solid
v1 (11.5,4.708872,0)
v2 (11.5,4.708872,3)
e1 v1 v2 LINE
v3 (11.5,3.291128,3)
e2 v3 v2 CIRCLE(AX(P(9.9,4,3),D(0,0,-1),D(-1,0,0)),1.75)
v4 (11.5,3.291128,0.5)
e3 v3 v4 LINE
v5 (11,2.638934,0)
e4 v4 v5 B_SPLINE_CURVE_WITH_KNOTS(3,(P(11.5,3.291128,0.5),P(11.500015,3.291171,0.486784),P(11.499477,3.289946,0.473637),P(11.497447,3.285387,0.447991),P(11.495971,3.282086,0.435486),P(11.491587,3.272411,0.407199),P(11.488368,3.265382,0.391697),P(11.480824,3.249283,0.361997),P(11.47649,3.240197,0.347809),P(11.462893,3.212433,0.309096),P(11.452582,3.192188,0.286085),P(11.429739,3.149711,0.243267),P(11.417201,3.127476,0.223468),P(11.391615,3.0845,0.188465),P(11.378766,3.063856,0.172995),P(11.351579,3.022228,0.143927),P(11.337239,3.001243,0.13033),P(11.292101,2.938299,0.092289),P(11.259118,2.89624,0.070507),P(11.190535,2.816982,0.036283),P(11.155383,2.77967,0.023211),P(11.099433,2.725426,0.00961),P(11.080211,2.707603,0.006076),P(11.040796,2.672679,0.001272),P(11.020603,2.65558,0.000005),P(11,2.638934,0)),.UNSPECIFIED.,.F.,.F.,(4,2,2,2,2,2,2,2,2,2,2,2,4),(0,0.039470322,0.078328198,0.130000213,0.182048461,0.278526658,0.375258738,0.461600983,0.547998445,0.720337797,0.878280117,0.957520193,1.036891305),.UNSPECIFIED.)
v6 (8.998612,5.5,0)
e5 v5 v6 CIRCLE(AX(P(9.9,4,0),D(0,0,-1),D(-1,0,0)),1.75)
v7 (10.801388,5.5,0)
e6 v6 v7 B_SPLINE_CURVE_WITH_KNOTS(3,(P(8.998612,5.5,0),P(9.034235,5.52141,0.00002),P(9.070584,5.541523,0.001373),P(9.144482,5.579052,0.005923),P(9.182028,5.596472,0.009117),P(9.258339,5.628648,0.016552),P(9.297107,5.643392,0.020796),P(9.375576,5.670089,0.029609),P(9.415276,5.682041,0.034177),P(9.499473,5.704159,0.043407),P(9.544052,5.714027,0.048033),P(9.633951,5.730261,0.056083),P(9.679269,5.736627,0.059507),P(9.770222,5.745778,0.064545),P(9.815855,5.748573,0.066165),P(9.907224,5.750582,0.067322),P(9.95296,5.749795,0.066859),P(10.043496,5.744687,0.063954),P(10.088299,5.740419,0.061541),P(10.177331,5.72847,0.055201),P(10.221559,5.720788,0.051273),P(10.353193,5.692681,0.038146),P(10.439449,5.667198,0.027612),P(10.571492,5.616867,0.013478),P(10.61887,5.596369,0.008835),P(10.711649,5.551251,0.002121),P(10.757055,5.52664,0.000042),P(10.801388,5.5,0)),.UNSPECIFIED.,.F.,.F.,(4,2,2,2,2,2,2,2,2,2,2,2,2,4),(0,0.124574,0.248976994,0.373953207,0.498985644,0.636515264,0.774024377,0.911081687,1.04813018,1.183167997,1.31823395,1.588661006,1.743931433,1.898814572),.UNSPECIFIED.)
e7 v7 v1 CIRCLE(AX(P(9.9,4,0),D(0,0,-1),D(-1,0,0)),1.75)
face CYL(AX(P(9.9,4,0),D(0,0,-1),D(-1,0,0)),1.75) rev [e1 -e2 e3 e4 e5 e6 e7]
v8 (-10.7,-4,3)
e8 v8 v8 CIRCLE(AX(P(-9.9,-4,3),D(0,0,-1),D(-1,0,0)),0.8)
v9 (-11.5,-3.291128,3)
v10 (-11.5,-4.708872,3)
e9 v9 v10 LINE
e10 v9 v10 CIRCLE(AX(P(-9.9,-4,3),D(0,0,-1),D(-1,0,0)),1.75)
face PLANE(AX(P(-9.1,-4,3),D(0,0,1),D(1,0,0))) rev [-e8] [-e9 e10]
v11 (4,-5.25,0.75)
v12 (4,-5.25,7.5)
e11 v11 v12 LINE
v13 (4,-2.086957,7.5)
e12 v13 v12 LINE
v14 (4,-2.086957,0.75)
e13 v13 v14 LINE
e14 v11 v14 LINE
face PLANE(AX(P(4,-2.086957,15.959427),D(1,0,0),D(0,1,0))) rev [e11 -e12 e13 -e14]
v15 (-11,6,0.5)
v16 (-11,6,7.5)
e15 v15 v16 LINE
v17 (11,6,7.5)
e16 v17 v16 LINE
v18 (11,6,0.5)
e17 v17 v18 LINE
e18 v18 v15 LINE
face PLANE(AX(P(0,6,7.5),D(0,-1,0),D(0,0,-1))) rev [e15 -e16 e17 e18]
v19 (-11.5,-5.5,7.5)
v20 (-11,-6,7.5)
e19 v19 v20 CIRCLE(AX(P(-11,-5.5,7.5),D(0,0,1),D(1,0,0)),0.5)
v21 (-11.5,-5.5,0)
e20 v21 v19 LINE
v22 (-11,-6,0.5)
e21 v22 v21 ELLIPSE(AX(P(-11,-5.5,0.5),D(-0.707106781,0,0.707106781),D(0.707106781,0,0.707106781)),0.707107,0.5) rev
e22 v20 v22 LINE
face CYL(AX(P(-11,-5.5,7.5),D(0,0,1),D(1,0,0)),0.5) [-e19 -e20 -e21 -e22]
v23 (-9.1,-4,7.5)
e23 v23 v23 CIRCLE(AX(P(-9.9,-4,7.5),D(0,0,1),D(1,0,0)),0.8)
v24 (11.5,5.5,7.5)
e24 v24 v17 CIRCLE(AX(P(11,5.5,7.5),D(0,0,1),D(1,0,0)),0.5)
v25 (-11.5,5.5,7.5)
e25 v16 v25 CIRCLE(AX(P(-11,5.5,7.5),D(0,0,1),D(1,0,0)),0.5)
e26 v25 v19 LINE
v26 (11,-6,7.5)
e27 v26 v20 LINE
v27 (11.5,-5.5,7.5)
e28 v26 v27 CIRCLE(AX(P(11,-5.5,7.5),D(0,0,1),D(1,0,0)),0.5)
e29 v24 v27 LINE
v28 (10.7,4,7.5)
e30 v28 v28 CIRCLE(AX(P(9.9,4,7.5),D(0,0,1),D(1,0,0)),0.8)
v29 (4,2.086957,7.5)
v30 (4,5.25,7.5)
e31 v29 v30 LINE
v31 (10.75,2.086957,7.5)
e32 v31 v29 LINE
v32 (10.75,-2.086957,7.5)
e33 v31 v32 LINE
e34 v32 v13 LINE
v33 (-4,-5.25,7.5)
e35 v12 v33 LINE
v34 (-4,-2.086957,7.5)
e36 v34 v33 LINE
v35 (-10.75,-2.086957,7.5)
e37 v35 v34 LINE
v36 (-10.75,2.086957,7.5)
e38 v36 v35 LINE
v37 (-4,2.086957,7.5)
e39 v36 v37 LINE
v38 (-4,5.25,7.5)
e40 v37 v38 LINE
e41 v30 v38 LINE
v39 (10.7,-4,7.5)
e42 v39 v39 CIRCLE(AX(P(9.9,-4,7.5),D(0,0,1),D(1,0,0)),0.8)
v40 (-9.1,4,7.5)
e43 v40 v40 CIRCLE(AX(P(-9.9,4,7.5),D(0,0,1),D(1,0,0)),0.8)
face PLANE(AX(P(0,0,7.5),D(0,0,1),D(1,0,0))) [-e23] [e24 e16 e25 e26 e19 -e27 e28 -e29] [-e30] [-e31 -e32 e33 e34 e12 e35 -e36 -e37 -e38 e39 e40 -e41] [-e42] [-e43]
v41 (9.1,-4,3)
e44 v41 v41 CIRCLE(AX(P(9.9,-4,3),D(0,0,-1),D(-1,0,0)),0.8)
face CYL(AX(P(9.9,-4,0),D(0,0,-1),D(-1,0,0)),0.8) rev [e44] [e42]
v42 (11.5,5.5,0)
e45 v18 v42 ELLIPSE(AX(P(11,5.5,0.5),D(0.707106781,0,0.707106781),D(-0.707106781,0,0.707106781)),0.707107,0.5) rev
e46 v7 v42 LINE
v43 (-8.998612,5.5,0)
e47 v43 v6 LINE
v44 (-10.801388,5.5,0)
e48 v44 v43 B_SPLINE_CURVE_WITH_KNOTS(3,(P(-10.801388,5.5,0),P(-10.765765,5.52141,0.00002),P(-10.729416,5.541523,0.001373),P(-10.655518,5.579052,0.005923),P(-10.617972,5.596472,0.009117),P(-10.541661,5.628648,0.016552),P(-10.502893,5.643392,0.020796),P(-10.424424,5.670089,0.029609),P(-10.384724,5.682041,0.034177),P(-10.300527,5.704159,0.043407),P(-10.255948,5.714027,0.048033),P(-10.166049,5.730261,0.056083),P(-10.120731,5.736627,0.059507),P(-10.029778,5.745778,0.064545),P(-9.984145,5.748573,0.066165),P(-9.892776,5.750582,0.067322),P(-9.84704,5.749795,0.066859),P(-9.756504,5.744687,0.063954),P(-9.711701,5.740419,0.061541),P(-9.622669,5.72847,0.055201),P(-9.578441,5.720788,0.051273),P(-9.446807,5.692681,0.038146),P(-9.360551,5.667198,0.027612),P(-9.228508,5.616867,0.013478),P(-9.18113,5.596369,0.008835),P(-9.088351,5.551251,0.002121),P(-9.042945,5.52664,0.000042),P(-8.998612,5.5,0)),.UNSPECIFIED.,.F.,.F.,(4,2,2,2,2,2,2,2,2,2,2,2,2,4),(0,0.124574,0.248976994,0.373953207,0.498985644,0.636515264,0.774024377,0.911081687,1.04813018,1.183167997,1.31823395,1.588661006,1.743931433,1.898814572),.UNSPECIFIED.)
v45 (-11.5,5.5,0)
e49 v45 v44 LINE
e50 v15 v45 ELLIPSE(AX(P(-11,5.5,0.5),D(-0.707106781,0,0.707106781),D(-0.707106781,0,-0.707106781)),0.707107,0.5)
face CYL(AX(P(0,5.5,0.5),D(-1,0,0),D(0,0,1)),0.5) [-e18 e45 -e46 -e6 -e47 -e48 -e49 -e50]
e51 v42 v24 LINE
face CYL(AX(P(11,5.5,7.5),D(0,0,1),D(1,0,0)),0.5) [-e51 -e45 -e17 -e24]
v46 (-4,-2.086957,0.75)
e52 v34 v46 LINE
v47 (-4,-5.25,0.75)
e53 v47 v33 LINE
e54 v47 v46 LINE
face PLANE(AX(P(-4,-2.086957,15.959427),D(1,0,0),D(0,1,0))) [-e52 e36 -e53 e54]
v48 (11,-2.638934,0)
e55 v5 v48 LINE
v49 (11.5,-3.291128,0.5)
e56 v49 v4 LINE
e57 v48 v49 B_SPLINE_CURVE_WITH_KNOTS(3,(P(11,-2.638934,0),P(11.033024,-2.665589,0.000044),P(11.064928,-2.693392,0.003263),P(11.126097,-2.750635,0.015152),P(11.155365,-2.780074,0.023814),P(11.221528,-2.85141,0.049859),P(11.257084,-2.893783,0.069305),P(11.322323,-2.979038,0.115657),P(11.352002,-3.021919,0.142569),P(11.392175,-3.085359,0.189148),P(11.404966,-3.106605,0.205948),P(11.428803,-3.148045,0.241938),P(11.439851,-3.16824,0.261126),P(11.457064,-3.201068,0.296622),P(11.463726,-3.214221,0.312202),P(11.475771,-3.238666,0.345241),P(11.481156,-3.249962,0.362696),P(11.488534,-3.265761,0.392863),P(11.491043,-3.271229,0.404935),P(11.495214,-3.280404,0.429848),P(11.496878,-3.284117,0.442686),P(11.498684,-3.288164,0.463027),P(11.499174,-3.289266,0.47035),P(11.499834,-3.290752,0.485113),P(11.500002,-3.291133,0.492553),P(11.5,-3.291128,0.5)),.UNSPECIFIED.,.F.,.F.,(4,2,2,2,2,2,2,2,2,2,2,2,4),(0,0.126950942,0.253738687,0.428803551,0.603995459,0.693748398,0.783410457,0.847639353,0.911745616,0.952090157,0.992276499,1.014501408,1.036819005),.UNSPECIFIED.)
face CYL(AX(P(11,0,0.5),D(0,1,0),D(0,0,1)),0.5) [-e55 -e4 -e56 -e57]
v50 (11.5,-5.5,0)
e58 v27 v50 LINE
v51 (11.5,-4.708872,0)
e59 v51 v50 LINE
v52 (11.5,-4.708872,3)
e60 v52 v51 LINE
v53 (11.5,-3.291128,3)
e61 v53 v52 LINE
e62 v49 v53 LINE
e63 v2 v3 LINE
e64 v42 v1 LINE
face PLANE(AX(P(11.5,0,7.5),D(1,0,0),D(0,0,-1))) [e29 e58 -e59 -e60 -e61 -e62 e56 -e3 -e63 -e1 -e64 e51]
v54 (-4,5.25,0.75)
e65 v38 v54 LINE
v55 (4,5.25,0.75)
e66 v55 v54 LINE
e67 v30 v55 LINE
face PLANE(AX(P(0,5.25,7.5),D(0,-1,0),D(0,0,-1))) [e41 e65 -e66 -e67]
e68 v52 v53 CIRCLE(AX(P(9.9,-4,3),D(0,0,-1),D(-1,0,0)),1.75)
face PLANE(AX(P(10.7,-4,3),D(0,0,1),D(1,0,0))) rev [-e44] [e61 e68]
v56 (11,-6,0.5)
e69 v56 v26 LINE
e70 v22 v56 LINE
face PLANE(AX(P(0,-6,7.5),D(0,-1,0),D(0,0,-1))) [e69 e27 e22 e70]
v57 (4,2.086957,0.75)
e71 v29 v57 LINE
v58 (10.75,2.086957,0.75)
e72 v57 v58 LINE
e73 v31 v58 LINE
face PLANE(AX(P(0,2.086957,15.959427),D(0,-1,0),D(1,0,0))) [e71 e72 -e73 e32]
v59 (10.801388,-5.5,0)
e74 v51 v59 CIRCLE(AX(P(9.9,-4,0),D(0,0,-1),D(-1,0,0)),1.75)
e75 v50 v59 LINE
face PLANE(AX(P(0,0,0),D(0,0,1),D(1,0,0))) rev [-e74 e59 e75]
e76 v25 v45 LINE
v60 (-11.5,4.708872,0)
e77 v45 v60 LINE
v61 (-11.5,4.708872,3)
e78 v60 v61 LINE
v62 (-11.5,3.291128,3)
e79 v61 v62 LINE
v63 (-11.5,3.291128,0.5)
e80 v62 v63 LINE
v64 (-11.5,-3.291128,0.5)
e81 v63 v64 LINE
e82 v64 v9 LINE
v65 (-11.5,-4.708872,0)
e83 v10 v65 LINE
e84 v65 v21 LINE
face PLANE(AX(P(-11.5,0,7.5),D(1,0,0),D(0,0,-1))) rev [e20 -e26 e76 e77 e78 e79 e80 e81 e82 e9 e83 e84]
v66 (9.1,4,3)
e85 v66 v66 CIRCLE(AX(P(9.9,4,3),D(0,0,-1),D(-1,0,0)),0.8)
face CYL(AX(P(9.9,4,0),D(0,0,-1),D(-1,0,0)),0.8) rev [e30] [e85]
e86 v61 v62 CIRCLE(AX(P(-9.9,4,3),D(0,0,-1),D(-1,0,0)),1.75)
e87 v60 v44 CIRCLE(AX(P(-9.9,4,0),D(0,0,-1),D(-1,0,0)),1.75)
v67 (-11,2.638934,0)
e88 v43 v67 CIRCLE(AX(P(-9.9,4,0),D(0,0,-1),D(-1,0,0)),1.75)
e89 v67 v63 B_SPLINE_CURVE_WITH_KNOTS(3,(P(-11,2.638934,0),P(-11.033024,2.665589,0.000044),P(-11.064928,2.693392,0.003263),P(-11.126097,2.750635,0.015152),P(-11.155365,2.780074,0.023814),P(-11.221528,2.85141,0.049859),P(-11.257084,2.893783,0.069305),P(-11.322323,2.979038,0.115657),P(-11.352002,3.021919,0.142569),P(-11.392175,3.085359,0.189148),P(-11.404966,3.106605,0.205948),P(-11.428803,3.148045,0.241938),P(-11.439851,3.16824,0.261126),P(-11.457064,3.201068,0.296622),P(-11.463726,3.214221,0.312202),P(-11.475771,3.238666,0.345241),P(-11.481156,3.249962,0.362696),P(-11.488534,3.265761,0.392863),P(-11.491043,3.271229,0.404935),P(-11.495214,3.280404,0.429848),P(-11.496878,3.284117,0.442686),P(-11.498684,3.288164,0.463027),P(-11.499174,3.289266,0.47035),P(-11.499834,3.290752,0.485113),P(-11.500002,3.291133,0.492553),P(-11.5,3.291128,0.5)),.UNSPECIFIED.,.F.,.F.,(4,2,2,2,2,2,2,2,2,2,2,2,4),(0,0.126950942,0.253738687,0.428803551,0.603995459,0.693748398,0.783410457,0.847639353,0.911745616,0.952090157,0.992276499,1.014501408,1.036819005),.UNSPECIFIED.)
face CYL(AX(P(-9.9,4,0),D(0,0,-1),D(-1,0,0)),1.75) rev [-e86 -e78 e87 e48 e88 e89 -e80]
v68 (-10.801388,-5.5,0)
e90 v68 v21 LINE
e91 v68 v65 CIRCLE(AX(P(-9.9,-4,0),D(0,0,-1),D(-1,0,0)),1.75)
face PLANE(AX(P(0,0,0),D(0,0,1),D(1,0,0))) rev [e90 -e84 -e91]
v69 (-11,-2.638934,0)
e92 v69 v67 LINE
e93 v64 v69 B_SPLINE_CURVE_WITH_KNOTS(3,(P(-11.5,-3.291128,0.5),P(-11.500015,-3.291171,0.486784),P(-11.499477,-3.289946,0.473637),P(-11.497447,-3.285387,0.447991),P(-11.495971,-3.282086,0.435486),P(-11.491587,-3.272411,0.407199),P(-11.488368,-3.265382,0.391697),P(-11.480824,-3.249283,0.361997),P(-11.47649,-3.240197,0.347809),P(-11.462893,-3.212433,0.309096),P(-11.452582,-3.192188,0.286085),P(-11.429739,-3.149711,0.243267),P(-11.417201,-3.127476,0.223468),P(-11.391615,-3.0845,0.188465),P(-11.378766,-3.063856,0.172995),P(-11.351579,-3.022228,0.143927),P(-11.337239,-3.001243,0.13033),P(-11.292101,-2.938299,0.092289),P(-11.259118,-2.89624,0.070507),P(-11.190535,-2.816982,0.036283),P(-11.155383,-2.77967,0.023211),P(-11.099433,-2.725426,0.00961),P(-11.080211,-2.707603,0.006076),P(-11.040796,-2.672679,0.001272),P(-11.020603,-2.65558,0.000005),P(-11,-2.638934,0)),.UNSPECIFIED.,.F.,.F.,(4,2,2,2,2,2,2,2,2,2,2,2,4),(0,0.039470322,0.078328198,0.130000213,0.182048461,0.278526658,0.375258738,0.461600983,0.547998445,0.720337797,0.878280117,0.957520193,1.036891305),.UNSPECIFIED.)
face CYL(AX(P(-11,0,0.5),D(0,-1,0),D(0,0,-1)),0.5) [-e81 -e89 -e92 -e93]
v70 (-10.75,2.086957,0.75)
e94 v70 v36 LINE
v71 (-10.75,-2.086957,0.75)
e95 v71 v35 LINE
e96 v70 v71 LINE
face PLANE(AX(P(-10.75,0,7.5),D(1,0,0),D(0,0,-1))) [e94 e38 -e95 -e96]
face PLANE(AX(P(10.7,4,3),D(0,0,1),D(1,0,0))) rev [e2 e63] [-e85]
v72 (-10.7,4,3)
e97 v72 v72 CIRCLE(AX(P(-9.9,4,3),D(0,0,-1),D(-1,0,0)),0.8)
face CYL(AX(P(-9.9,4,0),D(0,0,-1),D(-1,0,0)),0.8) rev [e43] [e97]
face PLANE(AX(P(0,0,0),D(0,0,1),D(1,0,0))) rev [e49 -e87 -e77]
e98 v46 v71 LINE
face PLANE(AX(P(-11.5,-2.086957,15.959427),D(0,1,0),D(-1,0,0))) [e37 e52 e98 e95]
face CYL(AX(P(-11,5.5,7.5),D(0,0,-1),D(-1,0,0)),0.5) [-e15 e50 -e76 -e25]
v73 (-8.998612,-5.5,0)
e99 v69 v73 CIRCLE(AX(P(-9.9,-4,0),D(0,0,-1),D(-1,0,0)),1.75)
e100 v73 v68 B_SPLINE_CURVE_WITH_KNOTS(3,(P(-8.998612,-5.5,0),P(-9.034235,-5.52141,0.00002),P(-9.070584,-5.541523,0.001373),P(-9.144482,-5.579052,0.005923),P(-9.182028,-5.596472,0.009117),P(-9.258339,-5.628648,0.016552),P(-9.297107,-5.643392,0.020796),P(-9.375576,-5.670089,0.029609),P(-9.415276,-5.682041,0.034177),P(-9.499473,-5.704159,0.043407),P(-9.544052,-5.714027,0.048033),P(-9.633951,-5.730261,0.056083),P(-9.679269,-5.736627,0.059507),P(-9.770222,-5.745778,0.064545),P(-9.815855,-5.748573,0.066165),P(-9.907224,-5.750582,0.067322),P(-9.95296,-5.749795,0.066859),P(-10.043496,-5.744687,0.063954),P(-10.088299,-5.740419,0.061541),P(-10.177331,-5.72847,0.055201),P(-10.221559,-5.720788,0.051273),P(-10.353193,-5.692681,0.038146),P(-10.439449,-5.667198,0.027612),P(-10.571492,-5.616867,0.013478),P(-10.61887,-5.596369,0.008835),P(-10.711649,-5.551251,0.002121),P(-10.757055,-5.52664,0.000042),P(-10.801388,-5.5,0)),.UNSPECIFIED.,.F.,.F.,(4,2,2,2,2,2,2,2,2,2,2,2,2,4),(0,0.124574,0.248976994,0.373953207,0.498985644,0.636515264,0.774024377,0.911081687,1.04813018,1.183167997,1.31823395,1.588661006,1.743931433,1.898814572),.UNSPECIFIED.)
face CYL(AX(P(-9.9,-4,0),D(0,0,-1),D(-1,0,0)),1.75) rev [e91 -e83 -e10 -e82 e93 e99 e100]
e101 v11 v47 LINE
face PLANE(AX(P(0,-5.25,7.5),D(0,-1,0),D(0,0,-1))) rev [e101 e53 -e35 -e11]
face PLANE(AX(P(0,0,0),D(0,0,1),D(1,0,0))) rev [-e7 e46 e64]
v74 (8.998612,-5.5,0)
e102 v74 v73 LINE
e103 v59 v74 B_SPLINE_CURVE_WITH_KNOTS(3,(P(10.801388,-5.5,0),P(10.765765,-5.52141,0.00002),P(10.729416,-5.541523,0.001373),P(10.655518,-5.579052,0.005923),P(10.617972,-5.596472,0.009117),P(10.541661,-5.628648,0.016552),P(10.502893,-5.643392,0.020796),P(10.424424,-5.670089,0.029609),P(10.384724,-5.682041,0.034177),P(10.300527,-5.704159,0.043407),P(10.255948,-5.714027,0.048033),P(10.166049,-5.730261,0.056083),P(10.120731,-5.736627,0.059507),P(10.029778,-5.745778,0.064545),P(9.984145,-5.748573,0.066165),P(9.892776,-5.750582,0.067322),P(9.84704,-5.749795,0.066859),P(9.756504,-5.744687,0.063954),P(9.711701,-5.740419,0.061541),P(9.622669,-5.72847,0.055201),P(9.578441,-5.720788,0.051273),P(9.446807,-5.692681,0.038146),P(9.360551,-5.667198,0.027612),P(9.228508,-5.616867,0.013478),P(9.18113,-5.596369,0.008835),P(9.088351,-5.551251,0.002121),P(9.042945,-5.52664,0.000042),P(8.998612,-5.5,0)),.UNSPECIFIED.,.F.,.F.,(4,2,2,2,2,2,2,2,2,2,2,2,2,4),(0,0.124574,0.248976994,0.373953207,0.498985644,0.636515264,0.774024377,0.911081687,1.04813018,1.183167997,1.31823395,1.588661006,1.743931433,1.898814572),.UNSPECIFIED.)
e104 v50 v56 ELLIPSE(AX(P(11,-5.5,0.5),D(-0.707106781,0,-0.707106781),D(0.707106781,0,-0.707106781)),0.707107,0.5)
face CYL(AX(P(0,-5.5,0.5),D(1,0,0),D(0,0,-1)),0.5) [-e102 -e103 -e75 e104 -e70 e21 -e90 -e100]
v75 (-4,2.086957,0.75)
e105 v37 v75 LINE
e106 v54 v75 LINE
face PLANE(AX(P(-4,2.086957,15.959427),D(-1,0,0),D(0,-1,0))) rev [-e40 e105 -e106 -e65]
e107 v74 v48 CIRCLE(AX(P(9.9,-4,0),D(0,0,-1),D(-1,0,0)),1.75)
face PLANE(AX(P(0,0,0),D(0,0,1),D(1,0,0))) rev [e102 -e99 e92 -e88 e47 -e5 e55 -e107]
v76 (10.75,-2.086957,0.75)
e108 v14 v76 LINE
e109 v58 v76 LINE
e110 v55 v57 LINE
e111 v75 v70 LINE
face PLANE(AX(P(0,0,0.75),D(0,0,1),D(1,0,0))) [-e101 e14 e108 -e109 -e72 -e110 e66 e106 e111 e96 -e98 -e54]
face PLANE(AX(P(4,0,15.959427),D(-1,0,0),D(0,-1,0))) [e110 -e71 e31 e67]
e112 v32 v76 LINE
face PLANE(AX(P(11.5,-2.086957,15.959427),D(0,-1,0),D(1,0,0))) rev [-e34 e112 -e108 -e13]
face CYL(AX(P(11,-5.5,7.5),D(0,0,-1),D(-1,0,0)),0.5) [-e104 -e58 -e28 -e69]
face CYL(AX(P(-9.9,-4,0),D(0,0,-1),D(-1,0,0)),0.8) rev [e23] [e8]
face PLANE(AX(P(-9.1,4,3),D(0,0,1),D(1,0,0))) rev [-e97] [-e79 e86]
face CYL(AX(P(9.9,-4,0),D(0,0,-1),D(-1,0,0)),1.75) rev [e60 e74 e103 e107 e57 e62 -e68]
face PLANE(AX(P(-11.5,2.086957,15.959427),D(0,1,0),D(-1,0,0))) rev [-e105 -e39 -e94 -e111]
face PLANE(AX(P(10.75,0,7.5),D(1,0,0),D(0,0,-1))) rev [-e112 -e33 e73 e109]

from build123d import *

# Parameters (mm, degrees)
SKETCH1_W           = 7.5
SKETCH1_H           = 3.913043478
BOSS_EXTRUDE1_DEPTH = 7.5
SHELL2_T            = -0.75
SKETCH1_4_W         = 7.5
SKETCH1_4_H         = 3.913043478
BOSS_EXTRUDE2_DEPTH = 7.5
HOLE2_D             = 1.6
HOLE2_DEPTH         = 10
HOLE2_CBORE_D       = 3.5
HOLE2_CBORE_DEPTH   = 3
FILLET1_R           = 0.5


with BuildPart() as part:
    # Sketch1 → Boss-Extrude1 (new body)
    with BuildSketch(Plane.XY):
        Polygon((4, 2.086956522), (4, 6), (-4, 6), (-4, 2.086956522), (-11.5, 2.086956522), (-11.5, -2.086956522), (-4, -2.086956522), (-4, -6), (4, -6), (4, -2.086956522), (11.5, -2.086956522), (11.5, 2.086956522), align=None)
        with Locations((-7.75, 4.043478261)):
            Rectangle(SKETCH1_W, SKETCH1_H)
        with Locations((7.75, 4.043478261)):
            Rectangle(SKETCH1_W, SKETCH1_H)
        with Locations((-7.75, -4.043478261)):
            Rectangle(SKETCH1_W, SKETCH1_H)
        with Locations((7.75, -4.043478261)):
            Rectangle(SKETCH1_W, SKETCH1_H)
    extrude(amount=BOSS_EXTRUDE1_DEPTH)

    # Shell2
    shell2_openings = [part.faces().sort_by_distance(p)[0] for p in [
        (0, 0, 7.5),
    ]]
    offset(amount=SHELL2_T, openings=shell2_openings, kind=Kind.INTERSECTION)

    # Sketch1<4> → Boss-Extrude2 (add)
    with BuildSketch(Plane.XY):
        with Locations((7.75, 4.043478261)):
            Rectangle(SKETCH1_4_W, SKETCH1_4_H)
        with Locations((-7.75, 4.043478261)):
            Rectangle(SKETCH1_4_W, SKETCH1_4_H)
        with Locations((-7.75, -4.043478261)):
            Rectangle(SKETCH1_4_W, SKETCH1_4_H)
        with Locations((7.75, -4.043478261)):
            Rectangle(SKETCH1_4_W, SKETCH1_4_H)
    extrude(amount=BOSS_EXTRUDE2_DEPTH)

    # Hole2
    with Locations(Plane(origin=(0, 0, 0), x_dir=(-1, 0, 0), z_dir=(0, 0, -1))):
        with Locations((-9.9, -4), (9.9, 4), (9.9, -4), (-9.9, 4)):
            CounterBoreHole(HOLE2_D / 2, HOLE2_CBORE_D / 2, HOLE2_CBORE_DEPTH, depth=HOLE2_DEPTH)

    # Fillet1
    # the kernel refuses this fillet: 0.5 mm, written as the material it takes off along each edge
    with BuildSketch(Plane(origin=(-11.5, 6, -1.25), x_dir=(1, 0, 0), z_dir=(0, 0, 1)), Plane(origin=(11.5, -6, -1.25), x_dir=(-1, 0, 0), z_dir=(0, 0, 1))) as fillet1_piece_1:
        with BuildLine():
            CenterArc((FILLET1_R, -FILLET1_R), FILLET1_R, 90, 90)
            Line((0, -FILLET1_R), (0, 0))
            Line((0, 0), (FILLET1_R, 0))
        make_face()
    extrude(amount=10, mode=Mode.SUBTRACT)
    with BuildSketch(Plane(origin=(-11.5, 4.541127656, 0), x_dir=(1, 0, 0), z_dir=(0, -1, 0)), Plane(origin=(11.5, 4.541127656, 0), x_dir=(0, 0, 1), z_dir=(0, -1, 0))) as fillet1_piece_2:
        with BuildLine():
            CenterArc((FILLET1_R, FILLET1_R), FILLET1_R, 180, 90)
            Line((0, FILLET1_R), (0, 0))
            Line((0, 0), (FILLET1_R, 0))
        make_face()
    extrude(amount=9.082255312, mode=Mode.SUBTRACT)
    with BuildSketch(Plane(origin=(12.75, 6, 0), x_dir=(0, 0, 1), z_dir=(-1, 0, 0))) as fillet1_piece_3:
        with BuildLine():
            CenterArc((FILLET1_R, -FILLET1_R), FILLET1_R, 90, 90)
            Line((0, -FILLET1_R), (0, 0))
            Line((0, 0), (FILLET1_R, 0))
        make_face()
    extrude(amount=25.5, mode=Mode.SUBTRACT)
    with BuildSketch(Plane(origin=(11.5, 6, -1.25), x_dir=(-1, 0, 0), z_dir=(0, 0, 1)), Plane(origin=(-11.5, -6, -1.25), x_dir=(1, 0, 0), z_dir=(0, 0, 1))) as fillet1_piece_4:
        with BuildLine():
            CenterArc((FILLET1_R, FILLET1_R), FILLET1_R, 180, 90)
            Line((0, FILLET1_R), (0, 0))
            Line((0, 0), (FILLET1_R, 0))
        make_face()
    extrude(amount=10, mode=Mode.SUBTRACT)
    with BuildSketch(Plane(origin=(12.75, -6, 0), x_dir=(0, 0, 1), z_dir=(-1, 0, 0))) as fillet1_piece_5:
        with BuildLine():
            CenterArc((FILLET1_R, FILLET1_R), FILLET1_R, 180, 90)
            Line((0, FILLET1_R), (0, 0))
            Line((0, 0), (FILLET1_R, 0))
        make_face()
    extrude(amount=25.5, mode=Mode.SUBTRACT)


solid = part.part
